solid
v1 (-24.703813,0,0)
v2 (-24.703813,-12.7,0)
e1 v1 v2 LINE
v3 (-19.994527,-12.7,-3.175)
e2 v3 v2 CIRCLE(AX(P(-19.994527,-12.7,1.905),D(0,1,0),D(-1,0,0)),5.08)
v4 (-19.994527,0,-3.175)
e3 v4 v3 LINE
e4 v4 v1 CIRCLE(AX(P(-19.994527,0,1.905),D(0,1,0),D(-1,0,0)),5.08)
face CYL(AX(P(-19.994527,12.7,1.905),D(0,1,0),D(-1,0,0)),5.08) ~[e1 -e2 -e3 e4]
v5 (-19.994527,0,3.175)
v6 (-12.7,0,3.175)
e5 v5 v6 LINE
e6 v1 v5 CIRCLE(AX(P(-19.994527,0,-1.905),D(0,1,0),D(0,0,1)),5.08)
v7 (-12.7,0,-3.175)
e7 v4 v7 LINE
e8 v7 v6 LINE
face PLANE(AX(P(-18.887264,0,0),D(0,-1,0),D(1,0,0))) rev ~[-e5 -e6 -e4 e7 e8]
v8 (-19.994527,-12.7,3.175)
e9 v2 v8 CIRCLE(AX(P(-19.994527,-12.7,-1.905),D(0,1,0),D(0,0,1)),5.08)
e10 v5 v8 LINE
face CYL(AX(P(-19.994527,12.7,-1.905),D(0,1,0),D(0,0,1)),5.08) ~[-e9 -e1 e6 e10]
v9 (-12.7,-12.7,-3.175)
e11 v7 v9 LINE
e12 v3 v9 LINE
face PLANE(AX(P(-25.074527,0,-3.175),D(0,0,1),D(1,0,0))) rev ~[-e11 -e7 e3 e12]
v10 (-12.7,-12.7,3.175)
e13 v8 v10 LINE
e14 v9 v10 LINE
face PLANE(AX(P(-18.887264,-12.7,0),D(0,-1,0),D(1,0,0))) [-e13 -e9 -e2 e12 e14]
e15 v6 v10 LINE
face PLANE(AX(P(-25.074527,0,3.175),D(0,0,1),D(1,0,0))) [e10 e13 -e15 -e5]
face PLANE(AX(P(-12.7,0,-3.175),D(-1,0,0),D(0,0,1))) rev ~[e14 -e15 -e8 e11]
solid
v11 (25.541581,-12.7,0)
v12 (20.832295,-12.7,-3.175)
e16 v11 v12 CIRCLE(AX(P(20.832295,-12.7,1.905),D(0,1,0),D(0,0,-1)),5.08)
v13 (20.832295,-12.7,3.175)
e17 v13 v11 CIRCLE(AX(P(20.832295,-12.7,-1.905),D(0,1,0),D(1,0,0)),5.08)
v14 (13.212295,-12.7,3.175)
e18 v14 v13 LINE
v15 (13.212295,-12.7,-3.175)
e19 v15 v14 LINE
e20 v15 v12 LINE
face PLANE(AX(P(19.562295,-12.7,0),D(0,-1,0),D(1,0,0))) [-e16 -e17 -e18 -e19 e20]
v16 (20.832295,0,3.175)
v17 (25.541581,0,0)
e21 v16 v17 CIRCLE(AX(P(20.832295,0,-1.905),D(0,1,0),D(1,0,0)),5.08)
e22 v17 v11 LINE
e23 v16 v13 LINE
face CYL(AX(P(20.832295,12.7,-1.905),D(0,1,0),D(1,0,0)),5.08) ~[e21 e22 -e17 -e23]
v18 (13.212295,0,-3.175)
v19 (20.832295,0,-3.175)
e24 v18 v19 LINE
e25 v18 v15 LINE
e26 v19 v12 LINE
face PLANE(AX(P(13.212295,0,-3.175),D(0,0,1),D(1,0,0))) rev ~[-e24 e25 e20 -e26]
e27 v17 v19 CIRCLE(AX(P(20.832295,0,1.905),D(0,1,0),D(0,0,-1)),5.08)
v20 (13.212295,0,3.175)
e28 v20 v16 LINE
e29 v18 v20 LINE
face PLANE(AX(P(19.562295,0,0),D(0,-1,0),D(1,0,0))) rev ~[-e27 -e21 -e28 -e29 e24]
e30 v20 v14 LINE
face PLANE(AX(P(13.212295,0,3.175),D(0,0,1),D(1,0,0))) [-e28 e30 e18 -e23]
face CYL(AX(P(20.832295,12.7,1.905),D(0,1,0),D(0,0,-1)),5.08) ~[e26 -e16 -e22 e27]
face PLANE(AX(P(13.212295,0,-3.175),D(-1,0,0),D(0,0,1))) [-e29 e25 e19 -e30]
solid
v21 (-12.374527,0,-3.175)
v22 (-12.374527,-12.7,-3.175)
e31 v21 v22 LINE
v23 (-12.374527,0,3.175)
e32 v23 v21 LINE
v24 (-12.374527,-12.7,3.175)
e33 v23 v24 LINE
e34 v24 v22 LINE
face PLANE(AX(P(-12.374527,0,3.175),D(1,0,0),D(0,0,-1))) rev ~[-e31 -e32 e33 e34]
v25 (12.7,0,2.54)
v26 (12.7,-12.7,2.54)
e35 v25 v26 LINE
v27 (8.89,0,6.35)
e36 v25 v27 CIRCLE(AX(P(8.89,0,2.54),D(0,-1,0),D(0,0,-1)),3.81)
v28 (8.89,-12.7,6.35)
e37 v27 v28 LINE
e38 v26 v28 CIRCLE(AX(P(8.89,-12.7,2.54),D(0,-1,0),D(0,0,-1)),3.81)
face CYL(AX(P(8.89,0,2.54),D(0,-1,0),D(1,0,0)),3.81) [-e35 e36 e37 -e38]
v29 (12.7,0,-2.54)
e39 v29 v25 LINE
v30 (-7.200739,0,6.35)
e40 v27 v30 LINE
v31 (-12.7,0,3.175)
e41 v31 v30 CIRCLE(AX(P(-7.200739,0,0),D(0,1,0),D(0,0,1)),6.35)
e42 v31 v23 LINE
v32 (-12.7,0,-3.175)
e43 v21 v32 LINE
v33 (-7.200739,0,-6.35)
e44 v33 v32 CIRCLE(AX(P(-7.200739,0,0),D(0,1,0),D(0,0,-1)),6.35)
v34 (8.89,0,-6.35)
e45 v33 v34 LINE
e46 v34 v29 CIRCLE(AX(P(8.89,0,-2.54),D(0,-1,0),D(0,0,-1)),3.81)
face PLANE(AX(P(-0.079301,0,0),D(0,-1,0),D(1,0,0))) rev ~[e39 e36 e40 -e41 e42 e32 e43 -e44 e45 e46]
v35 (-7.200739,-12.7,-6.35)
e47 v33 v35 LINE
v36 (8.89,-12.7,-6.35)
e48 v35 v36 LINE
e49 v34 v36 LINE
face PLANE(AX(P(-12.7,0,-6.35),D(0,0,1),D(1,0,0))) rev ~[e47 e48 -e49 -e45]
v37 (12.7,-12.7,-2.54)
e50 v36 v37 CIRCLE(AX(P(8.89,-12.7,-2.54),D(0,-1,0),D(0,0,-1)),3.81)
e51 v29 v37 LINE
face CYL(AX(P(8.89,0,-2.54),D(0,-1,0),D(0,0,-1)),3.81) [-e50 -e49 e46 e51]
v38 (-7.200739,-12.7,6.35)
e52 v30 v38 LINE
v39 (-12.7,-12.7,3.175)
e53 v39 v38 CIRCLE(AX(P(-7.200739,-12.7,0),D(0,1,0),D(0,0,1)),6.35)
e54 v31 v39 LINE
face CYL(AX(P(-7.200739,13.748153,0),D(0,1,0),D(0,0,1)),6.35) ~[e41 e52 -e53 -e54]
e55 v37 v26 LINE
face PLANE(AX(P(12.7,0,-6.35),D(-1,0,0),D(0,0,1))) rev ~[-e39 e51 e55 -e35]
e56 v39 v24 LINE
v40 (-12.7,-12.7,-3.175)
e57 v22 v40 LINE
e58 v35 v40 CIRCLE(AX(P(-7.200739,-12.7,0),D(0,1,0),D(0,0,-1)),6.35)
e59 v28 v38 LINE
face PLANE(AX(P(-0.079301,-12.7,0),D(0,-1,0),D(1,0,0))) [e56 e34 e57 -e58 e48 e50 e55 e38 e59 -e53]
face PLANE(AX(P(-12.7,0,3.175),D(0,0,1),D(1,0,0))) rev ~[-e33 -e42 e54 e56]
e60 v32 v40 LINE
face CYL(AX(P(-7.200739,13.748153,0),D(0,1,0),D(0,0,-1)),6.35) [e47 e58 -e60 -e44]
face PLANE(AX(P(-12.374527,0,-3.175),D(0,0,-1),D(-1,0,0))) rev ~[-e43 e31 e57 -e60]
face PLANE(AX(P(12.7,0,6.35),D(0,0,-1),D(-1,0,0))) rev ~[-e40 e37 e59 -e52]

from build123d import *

# Parameters (mm, degrees)
F0_W          = 12.7
F0_H          = 6.35
F1_DEPTH      = 12.7
F0_W_2        = 12.37452721
F2_T1_DEPTH   = 40.1963065702
F3_T1_DEPTH   = 38.1
F3_2_T1_DEPTH = 38.1
F4_R          = 3.81


# Not quite as in the source:
# - a fillet or chamfer that OpenCascade refuses, or shapes differently, is made with other operations: its cross-section is extruded or revolved along the edge and cut away or added


with BuildPart() as f1:
    # F0 (on Front) → F1 (new body)
    with BuildSketch(Plane.XZ):
        with Locations((19.5622947067, 0)):
            Rectangle(F0_W, F0_H)
    extrude(amount=F1_DEPTH)

    # F3: fillet of radius 5.08 on 2 edges, made by hand

    # F3_s2 → F3_t1 (cut)
    with BuildSketch(Plane.XZ.offset(-12.7)):
        with BuildLine():
            ThreePointArc((20.8322947067, -3.175), (24.4243971551, -1.6871024484), (25.9122947067, 1.905))
            Line((25.9122947067, 1.905), (25.9122947067, -3.175))
            Line((25.9122947067, -3.175), (20.8322947067, -3.175))
        make_face()
        with BuildLine():
            ThreePointArc((25.9122947067, -1.905), (24.4243971551, 1.6871024484), (20.8322947067, 3.175))
            Line((20.8322947067, 3.175), (25.9122947067, 3.175))
            Line((25.9122947067, 3.175), (25.9122947067, -1.905))
        make_face()
    extrude(amount=F3_T1_DEPTH, mode=Mode.SUBTRACT)


with BuildPart() as f1b:
    # F0 (on Front) → F1, piece 2 (new body)
    with BuildSketch(Plane.XZ):
        with Locations((-18.887263605, 0)):
            Rectangle(F0_W_2, F0_H)
    extrude(amount=F1_DEPTH)

    # F3#2: fillet of radius 5.08 on 2 edges, made by hand

    # F3_2_s2 → F3_2_t1 (cut)
    with BuildSketch(Plane.XZ.offset(-12.7)):
        with BuildLine():
            ThreePointArc((-25.07452721, 1.905), (-23.5866296584, -1.6871024484), (-19.99452721, -3.175))
            Line((-19.99452721, -3.175), (-25.07452721, -3.175))
            Line((-25.07452721, -3.175), (-25.07452721, 1.905))
        make_face()
        with BuildLine():
            ThreePointArc((-19.99452721, 3.175), (-23.5866296584, 1.6871024484), (-25.07452721, -1.905))
            Line((-25.07452721, -1.905), (-25.07452721, 3.175))
            Line((-25.07452721, 3.175), (-19.99452721, 3.175))
        make_face()
    extrude(amount=F3_2_T1_DEPTH, mode=Mode.SUBTRACT)


with BuildPart() as f1c:
    # F0 (on Front) → F1, piece 3 (new body)
    with BuildSketch(Plane.XZ):
        Polygon((-12.7, -6.35), (12.7, -6.35), (12.7, 6.35), (-12.7, 6.35), (-12.7, 3.175), (-12.37452721, 3.175), (-12.37452721, -3.175), (-12.7, -3.175), align=None)
    extrude(amount=F1_DEPTH)

    # F2: fillet of radius 6.35 on 2 edges, made by hand

    # F2_s2 → F2_t1 (cut)
    with BuildSketch(Plane.XZ.offset(-13.7481532851)):
        with BuildLine():
            ThreePointArc((-7.200738686, 6.35), (-10.375738686, 5.499261314), (-12.7, 3.175))
            Line((-12.7, 3.175), (-12.7, 6.35))
            Line((-12.7, 6.35), (-7.200738686, 6.35))
        make_face()
        with BuildLine():
            ThreePointArc((-7.200738686, -6.35), (-10.375738686, -5.499261314), (-12.7, -3.175))
            Line((-12.7, -3.175), (-12.7, -6.35))
            Line((-12.7, -6.35), (-7.200738686, -6.35))
        make_face()
    extrude(amount=F2_T1_DEPTH, mode=Mode.SUBTRACT)

    # F4
    f4_edges = [f1c.edges().sort_by_distance(p)[0] for p in [
        (12.7, -6.35, 6.35),
        (12.7, -6.35, -6.35),
    ]]
    fillet(f4_edges, radius=F4_R)


solid = Compound([f1.part, f1b.part, f1c.part])
